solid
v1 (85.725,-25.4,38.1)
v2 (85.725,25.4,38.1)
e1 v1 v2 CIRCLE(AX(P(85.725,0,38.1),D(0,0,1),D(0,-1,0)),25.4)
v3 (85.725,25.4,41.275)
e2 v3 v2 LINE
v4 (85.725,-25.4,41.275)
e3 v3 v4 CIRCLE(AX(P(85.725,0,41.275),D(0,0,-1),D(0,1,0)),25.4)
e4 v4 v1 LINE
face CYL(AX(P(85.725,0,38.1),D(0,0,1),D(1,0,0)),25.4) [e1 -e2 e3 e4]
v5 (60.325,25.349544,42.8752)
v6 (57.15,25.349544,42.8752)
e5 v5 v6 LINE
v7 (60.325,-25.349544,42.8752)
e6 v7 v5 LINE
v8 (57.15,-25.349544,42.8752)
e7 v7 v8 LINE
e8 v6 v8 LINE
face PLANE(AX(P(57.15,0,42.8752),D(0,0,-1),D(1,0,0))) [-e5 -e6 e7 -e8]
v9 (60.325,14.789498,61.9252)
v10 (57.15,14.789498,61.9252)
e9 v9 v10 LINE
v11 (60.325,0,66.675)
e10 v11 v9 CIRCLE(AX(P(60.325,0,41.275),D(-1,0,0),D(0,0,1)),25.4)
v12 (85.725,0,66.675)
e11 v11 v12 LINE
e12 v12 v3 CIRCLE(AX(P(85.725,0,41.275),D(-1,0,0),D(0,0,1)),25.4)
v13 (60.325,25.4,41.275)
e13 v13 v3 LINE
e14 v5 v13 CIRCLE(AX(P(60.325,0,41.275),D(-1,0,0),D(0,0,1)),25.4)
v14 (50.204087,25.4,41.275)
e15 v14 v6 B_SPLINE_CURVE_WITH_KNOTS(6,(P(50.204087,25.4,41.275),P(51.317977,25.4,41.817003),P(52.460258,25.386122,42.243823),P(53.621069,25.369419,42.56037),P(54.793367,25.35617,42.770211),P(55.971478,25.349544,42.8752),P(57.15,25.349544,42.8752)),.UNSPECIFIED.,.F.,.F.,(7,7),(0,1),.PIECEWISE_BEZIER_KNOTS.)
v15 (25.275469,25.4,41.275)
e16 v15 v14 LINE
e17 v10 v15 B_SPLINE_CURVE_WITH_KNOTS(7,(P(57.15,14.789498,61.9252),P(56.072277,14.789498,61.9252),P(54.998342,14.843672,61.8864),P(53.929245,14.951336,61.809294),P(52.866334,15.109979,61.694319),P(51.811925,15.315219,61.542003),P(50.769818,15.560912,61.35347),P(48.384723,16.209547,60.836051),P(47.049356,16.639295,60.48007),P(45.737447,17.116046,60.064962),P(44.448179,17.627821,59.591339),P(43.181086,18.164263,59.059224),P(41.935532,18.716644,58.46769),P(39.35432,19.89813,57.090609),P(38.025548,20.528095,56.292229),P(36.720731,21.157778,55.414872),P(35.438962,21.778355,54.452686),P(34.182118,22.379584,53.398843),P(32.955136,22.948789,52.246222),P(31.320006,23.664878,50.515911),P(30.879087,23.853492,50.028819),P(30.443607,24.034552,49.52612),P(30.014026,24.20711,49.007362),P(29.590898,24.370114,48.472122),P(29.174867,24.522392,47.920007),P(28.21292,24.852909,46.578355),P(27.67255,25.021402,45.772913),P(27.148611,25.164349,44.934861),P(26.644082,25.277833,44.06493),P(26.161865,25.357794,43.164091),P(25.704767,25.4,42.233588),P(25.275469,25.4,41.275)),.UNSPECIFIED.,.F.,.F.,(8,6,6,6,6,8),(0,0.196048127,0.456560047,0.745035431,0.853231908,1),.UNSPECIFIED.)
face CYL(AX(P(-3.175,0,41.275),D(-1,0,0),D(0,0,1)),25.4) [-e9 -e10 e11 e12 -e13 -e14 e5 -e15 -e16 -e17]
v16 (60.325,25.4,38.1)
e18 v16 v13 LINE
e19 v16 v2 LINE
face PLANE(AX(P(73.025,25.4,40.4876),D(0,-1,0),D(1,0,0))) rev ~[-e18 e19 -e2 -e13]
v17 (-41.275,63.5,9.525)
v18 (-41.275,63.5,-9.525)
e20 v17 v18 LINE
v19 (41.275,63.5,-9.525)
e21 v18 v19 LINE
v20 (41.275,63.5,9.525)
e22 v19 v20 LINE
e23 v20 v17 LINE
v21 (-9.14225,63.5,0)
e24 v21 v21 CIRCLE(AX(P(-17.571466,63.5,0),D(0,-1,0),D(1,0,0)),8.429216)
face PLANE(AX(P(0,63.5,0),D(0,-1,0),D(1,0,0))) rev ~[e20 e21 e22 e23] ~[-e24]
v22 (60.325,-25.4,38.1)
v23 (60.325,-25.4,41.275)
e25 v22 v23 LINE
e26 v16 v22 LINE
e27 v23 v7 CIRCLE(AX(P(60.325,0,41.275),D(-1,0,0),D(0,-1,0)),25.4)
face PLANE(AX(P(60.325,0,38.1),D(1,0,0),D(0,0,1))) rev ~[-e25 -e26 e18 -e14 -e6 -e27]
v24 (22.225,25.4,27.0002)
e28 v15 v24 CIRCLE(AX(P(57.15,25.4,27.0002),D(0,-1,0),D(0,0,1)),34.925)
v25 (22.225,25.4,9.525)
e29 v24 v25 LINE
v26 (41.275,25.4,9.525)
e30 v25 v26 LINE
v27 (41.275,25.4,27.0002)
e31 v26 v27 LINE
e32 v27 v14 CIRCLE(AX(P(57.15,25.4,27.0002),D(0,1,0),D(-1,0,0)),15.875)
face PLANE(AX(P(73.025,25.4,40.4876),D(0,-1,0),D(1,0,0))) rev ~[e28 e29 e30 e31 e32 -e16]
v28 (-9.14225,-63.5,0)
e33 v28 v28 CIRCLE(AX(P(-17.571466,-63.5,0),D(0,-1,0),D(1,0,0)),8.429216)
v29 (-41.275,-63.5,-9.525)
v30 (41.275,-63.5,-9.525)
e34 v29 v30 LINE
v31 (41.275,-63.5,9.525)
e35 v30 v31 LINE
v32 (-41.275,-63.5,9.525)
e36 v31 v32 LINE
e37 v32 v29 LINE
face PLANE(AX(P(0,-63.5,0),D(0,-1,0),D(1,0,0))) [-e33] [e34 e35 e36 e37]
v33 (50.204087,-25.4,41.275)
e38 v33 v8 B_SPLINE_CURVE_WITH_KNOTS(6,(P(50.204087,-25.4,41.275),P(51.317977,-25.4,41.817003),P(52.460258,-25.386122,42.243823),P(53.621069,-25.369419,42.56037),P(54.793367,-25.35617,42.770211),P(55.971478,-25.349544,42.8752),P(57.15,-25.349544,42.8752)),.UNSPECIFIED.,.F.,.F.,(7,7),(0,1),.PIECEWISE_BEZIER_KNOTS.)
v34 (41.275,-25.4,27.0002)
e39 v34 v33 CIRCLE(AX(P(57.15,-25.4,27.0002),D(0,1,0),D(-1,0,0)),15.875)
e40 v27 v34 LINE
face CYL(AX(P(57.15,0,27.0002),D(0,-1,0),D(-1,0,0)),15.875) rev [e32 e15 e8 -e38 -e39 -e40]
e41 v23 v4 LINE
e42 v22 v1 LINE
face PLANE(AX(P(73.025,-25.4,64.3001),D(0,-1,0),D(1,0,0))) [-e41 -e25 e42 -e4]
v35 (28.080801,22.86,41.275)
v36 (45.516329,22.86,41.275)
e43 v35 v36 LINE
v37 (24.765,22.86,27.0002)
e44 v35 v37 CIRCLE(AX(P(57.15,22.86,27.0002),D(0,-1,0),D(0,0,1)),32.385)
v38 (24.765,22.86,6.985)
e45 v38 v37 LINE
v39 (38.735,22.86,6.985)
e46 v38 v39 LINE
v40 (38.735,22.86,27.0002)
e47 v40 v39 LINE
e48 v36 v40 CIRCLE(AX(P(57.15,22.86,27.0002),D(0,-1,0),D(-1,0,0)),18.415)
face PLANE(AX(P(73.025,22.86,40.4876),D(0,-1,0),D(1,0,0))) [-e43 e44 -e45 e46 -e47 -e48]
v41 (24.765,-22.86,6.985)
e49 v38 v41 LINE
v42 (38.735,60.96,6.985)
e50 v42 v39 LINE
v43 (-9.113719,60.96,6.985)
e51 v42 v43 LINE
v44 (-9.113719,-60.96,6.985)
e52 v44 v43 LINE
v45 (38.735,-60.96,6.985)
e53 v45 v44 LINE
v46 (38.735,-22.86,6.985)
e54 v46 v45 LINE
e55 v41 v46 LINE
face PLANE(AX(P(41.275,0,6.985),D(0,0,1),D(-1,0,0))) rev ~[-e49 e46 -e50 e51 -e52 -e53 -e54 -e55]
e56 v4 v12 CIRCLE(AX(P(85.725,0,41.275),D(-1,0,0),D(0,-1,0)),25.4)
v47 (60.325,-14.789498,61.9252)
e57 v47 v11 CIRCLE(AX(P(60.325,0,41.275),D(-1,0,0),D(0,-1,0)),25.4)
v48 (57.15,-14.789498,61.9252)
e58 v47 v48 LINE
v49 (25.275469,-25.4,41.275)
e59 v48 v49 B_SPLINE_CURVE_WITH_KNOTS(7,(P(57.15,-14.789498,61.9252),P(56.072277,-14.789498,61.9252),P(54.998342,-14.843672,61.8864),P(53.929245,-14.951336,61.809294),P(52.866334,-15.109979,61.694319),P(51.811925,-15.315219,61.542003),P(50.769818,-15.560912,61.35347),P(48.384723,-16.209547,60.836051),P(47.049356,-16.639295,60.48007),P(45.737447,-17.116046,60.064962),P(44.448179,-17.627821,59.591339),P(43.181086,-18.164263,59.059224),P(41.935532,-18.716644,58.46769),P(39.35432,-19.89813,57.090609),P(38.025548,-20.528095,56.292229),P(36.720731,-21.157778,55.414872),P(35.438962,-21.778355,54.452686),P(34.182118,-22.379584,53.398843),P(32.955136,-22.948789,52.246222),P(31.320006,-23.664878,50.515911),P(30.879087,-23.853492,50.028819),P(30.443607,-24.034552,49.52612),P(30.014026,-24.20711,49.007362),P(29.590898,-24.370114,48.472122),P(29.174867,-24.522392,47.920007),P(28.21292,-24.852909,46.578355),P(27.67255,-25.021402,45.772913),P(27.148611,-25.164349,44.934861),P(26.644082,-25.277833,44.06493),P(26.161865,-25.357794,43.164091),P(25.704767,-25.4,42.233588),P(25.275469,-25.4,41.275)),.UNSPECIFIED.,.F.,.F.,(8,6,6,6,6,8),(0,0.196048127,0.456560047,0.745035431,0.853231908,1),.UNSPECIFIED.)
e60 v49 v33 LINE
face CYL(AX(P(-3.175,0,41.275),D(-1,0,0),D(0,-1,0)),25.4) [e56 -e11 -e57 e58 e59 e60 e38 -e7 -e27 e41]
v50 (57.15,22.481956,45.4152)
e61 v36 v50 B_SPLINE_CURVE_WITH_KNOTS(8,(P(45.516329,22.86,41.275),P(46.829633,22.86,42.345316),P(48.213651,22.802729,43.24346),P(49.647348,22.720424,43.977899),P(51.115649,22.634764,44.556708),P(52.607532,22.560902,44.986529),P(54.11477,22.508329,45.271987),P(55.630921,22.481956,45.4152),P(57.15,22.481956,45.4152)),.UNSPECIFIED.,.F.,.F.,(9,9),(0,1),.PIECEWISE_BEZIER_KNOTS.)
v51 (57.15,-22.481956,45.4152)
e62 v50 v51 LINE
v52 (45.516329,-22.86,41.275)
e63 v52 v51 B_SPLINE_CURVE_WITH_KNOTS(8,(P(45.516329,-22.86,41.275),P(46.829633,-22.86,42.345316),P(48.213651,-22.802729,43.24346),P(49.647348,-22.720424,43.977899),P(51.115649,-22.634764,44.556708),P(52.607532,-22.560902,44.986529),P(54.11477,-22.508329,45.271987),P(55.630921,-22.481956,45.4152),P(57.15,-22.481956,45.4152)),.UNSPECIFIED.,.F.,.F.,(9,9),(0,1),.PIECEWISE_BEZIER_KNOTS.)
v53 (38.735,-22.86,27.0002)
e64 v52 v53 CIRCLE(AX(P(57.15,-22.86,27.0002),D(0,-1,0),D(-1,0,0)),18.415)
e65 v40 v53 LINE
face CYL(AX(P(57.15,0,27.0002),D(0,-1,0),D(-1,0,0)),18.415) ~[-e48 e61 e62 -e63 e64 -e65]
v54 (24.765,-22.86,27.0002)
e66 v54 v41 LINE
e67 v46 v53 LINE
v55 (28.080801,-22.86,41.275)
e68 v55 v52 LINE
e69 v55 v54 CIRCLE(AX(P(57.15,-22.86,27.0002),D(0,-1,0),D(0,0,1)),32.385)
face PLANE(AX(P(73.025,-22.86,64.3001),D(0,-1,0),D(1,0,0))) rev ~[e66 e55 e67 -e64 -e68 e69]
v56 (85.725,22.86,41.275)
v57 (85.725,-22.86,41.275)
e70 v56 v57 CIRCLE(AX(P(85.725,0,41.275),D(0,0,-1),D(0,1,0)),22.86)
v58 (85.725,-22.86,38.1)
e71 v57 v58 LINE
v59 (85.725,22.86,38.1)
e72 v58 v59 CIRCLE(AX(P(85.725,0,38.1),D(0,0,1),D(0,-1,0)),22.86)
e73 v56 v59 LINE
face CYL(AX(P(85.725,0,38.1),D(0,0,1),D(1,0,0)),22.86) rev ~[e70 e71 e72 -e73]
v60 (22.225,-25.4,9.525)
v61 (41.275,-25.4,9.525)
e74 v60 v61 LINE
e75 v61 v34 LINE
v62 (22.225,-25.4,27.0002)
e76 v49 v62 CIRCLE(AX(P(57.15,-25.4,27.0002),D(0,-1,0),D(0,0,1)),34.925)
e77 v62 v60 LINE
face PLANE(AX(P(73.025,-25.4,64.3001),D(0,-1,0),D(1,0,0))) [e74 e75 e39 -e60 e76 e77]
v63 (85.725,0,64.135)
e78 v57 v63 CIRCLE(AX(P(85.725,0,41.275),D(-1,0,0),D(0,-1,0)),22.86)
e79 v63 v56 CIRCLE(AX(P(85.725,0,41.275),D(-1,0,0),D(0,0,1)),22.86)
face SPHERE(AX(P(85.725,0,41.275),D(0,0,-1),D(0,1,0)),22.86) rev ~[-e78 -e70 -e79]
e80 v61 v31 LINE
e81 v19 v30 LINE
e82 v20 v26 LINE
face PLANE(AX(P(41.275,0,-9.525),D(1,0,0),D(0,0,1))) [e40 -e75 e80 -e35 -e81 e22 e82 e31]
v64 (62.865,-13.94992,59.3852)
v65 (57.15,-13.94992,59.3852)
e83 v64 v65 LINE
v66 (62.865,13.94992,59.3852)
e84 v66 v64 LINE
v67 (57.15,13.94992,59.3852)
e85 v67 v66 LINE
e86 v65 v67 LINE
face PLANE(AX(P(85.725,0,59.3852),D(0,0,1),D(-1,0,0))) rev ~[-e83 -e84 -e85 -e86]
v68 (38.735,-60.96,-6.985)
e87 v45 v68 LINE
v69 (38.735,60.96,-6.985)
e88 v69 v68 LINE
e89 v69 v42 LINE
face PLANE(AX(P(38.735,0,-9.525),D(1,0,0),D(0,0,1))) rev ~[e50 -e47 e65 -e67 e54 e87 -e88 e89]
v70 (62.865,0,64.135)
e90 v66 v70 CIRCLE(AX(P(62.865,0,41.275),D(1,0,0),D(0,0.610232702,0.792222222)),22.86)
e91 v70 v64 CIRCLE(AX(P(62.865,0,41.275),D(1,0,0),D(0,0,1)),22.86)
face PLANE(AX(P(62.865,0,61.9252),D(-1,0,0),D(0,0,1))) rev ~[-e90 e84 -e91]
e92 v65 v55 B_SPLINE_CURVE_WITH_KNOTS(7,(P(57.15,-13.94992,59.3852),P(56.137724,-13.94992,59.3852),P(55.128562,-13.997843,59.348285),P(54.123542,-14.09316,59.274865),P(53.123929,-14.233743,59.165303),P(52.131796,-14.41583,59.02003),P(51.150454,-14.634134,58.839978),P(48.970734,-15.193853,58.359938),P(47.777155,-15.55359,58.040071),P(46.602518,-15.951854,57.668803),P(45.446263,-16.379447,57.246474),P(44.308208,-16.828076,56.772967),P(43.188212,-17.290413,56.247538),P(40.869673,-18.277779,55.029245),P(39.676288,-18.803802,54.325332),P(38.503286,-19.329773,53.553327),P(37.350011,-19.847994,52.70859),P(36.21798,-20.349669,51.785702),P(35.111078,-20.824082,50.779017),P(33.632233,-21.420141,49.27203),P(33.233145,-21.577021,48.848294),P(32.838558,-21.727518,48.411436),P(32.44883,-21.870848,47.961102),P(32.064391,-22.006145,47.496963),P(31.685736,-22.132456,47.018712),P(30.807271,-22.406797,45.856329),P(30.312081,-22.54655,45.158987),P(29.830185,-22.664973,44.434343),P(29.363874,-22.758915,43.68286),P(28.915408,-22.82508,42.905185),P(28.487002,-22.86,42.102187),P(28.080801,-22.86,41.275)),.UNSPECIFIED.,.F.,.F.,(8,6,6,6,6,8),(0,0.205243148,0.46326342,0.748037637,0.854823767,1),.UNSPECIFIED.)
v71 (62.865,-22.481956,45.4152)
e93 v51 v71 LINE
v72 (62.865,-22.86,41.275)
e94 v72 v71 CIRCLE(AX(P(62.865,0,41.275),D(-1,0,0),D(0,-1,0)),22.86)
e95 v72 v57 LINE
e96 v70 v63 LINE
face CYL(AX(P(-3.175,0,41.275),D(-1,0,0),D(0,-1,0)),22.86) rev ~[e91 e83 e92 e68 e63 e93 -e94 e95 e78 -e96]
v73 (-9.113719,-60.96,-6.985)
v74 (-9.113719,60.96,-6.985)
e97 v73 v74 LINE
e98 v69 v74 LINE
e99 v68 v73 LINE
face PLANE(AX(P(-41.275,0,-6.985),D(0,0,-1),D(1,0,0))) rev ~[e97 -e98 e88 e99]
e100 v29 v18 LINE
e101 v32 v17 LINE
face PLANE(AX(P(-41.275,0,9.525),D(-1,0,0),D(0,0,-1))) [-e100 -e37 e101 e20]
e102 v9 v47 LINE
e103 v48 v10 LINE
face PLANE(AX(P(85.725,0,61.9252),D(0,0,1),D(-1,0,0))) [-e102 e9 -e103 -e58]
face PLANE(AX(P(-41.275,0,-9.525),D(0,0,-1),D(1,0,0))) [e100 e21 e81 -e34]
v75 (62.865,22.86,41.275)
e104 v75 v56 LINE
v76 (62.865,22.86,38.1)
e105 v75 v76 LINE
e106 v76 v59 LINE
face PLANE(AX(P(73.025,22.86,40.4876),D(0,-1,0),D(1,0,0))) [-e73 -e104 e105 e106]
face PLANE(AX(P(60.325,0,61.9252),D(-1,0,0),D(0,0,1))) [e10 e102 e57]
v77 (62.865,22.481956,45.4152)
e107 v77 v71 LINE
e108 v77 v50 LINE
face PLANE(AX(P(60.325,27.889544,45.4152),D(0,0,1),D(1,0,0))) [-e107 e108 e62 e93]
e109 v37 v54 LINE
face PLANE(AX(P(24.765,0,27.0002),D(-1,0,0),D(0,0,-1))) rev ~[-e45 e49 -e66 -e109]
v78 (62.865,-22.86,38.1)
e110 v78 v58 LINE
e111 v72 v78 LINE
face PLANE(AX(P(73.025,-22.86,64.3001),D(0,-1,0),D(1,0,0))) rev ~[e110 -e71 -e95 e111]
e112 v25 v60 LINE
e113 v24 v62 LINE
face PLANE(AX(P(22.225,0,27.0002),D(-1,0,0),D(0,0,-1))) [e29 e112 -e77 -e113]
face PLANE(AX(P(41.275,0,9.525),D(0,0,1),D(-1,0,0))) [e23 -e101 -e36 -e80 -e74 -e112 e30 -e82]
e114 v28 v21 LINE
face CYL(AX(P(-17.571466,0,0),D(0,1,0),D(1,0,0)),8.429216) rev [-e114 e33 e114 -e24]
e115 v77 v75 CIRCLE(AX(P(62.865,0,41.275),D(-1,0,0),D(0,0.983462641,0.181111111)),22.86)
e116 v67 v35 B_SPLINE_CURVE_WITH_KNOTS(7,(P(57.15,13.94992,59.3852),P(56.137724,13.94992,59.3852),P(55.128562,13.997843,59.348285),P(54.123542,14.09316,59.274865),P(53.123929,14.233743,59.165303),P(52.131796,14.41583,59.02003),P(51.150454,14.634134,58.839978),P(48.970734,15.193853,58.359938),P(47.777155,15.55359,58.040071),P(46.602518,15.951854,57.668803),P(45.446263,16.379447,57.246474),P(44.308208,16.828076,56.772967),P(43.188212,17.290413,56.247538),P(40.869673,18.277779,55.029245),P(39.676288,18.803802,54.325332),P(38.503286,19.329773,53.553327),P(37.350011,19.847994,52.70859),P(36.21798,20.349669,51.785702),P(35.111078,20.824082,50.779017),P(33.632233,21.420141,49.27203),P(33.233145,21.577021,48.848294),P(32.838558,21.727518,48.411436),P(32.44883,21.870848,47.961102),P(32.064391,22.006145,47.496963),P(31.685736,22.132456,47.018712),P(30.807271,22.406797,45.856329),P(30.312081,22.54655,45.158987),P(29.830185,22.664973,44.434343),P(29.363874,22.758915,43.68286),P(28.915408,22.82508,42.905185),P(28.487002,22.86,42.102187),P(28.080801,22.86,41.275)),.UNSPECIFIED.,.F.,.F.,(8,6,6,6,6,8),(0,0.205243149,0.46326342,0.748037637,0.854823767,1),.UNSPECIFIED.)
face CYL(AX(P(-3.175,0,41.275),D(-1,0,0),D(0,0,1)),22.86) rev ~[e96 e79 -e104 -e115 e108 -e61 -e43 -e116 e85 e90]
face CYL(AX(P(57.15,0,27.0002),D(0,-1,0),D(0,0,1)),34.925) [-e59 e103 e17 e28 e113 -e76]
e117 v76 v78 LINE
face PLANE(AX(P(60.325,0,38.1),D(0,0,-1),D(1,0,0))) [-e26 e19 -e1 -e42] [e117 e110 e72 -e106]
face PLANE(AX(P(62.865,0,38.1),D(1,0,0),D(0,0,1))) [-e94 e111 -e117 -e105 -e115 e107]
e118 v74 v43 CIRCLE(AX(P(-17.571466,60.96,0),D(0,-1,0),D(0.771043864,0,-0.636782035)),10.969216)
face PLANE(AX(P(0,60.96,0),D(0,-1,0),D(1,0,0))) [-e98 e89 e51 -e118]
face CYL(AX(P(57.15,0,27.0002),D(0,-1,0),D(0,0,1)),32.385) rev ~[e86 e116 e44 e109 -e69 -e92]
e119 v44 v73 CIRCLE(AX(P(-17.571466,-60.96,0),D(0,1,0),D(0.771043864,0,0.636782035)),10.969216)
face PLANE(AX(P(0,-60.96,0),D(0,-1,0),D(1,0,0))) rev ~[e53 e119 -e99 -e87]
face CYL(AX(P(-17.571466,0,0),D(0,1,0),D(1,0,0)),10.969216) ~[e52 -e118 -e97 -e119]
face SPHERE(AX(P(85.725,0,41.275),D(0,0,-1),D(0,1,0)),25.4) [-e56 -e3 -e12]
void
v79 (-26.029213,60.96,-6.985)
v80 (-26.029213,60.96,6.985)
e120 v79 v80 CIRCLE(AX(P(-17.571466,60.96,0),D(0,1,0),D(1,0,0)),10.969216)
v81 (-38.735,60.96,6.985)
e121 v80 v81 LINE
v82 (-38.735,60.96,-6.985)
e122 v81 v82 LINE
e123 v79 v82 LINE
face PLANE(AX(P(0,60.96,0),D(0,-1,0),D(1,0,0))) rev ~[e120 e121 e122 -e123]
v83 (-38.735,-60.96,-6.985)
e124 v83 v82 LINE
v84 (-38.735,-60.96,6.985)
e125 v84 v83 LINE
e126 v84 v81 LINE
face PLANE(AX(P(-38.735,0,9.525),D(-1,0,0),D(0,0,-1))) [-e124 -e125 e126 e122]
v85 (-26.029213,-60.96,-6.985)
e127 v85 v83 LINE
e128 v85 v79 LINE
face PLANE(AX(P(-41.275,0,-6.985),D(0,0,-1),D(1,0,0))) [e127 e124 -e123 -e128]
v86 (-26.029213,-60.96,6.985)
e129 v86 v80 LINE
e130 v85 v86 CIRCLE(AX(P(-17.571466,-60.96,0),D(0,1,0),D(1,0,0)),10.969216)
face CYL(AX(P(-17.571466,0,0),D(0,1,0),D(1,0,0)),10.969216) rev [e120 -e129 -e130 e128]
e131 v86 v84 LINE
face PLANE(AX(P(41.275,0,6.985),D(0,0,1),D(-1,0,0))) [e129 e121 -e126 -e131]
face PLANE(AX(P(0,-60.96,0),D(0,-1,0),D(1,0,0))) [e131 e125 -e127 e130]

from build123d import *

# Parameters (mm, degrees)
F0_R        = 8.4292164968
F1_DEPTH    = 63.5
F0_W        = 25.4
F0_H        = 19.05
F2_DEPTH    = 25.4
F0_H_2      = 4.7498
F0_H_3      = 4.7752
F4_DEPTH    = 25.4
F5_DEPTH    = 25.4
F6_T1_DEPTH = 88.9
F6_T4_ANGLE = 180
F7_T        = 2.54
F7_T3_DEPTH = 24.13
F7_T5_DEPTH = 55.88
F7_T7_DEPTH = 55.7790871697
F7_T9_DEPTH = 34.6589952471


# Not quite as in the source:
# - a fillet or chamfer that OpenCascade refuses, or shapes differently, is made with other operations: its cross-section is extruded or revolved along the edge and cut away or added
# - a feature of the source that left no trace in its solid (it failed there, or was rolled back) is left out
# - a shell that OpenCascade refuses in one call is made with other operations: the cavity is built on its own and cut out


with BuildPart() as f1:
    # F0 (on Front) → F1 (new body, symmetric)
    with BuildSketch(Plane.XZ):
        Polygon((-41.275, -9.525), (41.275, -9.525), (41.275, 9.525), (22.225, 9.525), (-41.275, 9.525), align=None)
        with Locations((-17.5714660436, 0)):
            Circle(F0_R, mode=Mode.SUBTRACT)
    extrude(amount=F1_DEPTH, both=True)

    # F0 (on Front) → F2 (join, symmetric)
    with BuildSketch(Plane.XZ):
        with BuildLine():
            Line((60.325, 61.9252), (57.15, 61.9252))
            ThreePointArc((57.15, 61.9252), (32.4542956671, 51.6959043329), (22.225, 27.0002))
            Line((22.225, 27.0002), (22.225, 9.525))
            Line((22.225, 9.525), (41.275, 9.525))
            Line((41.275, 9.525), (41.275, 27.0002))
            ThreePointArc((41.275, 27.0002), (45.9246798487, 38.2255201513), (57.15, 42.8752))
            Line((57.15, 42.8752), (60.325, 42.8752))
            Line((60.325, 42.8752), (60.325, 61.9252))
        make_face()
        with Locations((73.025, 52.4002)):
            Rectangle(F0_W, F0_H)
    extrude(amount=F2_DEPTH, both=True)

    # F0 (on Front) → F3 (revolve)
    with BuildSketch(Plane.XZ):
        Polygon((85.725, 66.675), (85.725, 61.9252), (85.725, 42.8752), (85.725, 38.1), (111.125, 38.1), (111.125, 66.675), align=None)
    revolve(axis=Axis((85.725, 0, 52.3875), (0, 0, 1)))

    # F0 (on Front) → F4 (join)
    with BuildSketch(Plane.XZ):
        with Locations((73.025, 64.3001)):
            Rectangle(F0_W, F0_H_2)
        with Locations((73.025, 40.4876)):
            Rectangle(F0_W, F0_H_3)
    extrude(amount=F4_DEPTH)

    # F0 (on Front) → F5 (join)
    with BuildSketch(Plane.XZ):
        with Locations((73.025, 40.4876)):
            Rectangle(F0_W, F0_H_3)
        with Locations((73.025, 64.3001)):
            Rectangle(F0_W, F0_H_2)
    extrude(amount=-F5_DEPTH)

    # F6: fillet of radius 25.4 on 3 edges, made by hand

    # F6_s2 → F6_t1 (cut)
    with BuildSketch(Plane.YZ.offset(-3.175)):
        with BuildLine():
            ThreePointArc((-25.4, 41.275), (-17.9605122421, 59.2355122421), (0, 66.675))
            Line((0, 66.675), (-25.4, 66.675))
            Line((-25.4, 66.675), (-25.4, 41.275))
        make_face()
        with BuildLine():
            ThreePointArc((0, 66.675), (17.9605122421, 59.2355122421), (25.4, 41.275))
            Line((25.4, 41.275), (25.4, 66.675))
            Line((25.4, 66.675), (0, 66.675))
        make_face()
    extrude(amount=F6_T1_DEPTH, mode=Mode.SUBTRACT)

    # F6_s3 → F6_t4 (revolve, cut)
    with BuildSketch(Plane.YZ.offset(85.725)):
        with BuildLine():
            ThreePointArc((0, 66.675), (17.9605122421, 59.2355122421), (25.4, 41.275))
            Line((25.4, 41.275), (25.4, 66.675))
            Line((25.4, 66.675), (0, 66.675))
        make_face()
    revolve(axis=Axis((85.725, 0, 66.675), (0, 0, -1)), revolution_arc=F6_T4_ANGLE, mode=Mode.SUBTRACT)

    # F7: shell of thickness 2.54, made by hand


with BuildPart() as f7_core1:
    # F7_t2: copy of F1
    add(f1.part)

    # the walls: a layer under each face that stays
    f7_faces = [f7_core1.faces().sort_by_distance(p)[0] for p in [
        (0, 0, -9.525),
        (0, 63.5, 0),
        (41.275, 0, 8.7376),
        (0, -63.5, 0),
        (-41.275, 0, 0),
        (0, 0, 9.525),
        (-26.0006825404, 0, 0),
        (36.214543408, 25.4, 25.4),
        (45.9246798487, 0, 38.2255201513),
        (36.214543408, -25.4, 25.4),
        (22.225, 0, 18.2626),
        (55.5002346295, 17.9605122421, 59.2355122421),
        (32.4542956671, 0, 51.6959043329),
        (55.5002346295, -17.9605122421, 59.2355122421),
        (58.7375, 0, 42.8752),
        (60.325, 0, 64.3001),
        (58.7375, 0, 61.9252),
        (60.325, 0, 40.4876),
        (73.025, 25.4, 39.6875),
        (103.6855122422, -1e-10, 59.2355122421),
        (73.025, -25.4, 39.6875),
        (111.125, 0, 39.6875),
    ]]
    thicken(f7_faces, amount=-F7_T, mode=Mode.SUBTRACT)

    # F7_s4 → F7_t3 (cut)
    with BuildSketch(Plane.YZ.offset(19.685)):
        Polygon((25.4254, 9.5504), (25.4, 6.985), (22.86, 6.985), (22.86, 9.525), align=None)
        Polygon((-25.4254, 9.5504), (-25.4, 6.985), (-22.86, 6.985), (-22.86, 9.525), align=None)
    extrude(amount=F7_T3_DEPTH, mode=Mode.SUBTRACT)

    # F7_s6 → F7_t5 (cut)
    with BuildSketch(Plane.XZ.offset(-27.94)):
        Polygon((22.1996, 9.5504), (22.225, 6.985), (24.765, 6.985), (24.765, 9.525), align=None)
    extrude(amount=F7_T5_DEPTH, mode=Mode.SUBTRACT)

    # F7_s8 → F7_t7 (cut)
    with BuildSketch(Plane.XZ.offset(-27.8895435848)):
        Polygon((60.2996, 42.8498), (60.325, 45.4152), (62.865, 45.4152), (62.865, 42.8752), align=None)
    extrude(amount=F7_T7_DEPTH, mode=Mode.SUBTRACT)

    # F7_s10 → F7_t9 (cut)
    with BuildSketch(Plane.XZ.offset(-17.3294976236)):
        Polygon((60.2996, 61.9506), (62.865, 61.9252), (62.865, 59.3852), (60.325, 59.3852), align=None)
    extrude(amount=F7_T9_DEPTH, mode=Mode.SUBTRACT)


with BuildPart() as f1_1:
    add(f1.part)

    # what is left inside the walls is the cavity
    f7_cavity = [f7_core1.part.solids().sort_by_distance(p)[0] for p in [
        (-28.566083, -20.32, 0),
        (14.810641, 20.32, -6.9596),
    ]]
    add(f7_cavity, mode=Mode.SUBTRACT)


solid = f1_1.part
